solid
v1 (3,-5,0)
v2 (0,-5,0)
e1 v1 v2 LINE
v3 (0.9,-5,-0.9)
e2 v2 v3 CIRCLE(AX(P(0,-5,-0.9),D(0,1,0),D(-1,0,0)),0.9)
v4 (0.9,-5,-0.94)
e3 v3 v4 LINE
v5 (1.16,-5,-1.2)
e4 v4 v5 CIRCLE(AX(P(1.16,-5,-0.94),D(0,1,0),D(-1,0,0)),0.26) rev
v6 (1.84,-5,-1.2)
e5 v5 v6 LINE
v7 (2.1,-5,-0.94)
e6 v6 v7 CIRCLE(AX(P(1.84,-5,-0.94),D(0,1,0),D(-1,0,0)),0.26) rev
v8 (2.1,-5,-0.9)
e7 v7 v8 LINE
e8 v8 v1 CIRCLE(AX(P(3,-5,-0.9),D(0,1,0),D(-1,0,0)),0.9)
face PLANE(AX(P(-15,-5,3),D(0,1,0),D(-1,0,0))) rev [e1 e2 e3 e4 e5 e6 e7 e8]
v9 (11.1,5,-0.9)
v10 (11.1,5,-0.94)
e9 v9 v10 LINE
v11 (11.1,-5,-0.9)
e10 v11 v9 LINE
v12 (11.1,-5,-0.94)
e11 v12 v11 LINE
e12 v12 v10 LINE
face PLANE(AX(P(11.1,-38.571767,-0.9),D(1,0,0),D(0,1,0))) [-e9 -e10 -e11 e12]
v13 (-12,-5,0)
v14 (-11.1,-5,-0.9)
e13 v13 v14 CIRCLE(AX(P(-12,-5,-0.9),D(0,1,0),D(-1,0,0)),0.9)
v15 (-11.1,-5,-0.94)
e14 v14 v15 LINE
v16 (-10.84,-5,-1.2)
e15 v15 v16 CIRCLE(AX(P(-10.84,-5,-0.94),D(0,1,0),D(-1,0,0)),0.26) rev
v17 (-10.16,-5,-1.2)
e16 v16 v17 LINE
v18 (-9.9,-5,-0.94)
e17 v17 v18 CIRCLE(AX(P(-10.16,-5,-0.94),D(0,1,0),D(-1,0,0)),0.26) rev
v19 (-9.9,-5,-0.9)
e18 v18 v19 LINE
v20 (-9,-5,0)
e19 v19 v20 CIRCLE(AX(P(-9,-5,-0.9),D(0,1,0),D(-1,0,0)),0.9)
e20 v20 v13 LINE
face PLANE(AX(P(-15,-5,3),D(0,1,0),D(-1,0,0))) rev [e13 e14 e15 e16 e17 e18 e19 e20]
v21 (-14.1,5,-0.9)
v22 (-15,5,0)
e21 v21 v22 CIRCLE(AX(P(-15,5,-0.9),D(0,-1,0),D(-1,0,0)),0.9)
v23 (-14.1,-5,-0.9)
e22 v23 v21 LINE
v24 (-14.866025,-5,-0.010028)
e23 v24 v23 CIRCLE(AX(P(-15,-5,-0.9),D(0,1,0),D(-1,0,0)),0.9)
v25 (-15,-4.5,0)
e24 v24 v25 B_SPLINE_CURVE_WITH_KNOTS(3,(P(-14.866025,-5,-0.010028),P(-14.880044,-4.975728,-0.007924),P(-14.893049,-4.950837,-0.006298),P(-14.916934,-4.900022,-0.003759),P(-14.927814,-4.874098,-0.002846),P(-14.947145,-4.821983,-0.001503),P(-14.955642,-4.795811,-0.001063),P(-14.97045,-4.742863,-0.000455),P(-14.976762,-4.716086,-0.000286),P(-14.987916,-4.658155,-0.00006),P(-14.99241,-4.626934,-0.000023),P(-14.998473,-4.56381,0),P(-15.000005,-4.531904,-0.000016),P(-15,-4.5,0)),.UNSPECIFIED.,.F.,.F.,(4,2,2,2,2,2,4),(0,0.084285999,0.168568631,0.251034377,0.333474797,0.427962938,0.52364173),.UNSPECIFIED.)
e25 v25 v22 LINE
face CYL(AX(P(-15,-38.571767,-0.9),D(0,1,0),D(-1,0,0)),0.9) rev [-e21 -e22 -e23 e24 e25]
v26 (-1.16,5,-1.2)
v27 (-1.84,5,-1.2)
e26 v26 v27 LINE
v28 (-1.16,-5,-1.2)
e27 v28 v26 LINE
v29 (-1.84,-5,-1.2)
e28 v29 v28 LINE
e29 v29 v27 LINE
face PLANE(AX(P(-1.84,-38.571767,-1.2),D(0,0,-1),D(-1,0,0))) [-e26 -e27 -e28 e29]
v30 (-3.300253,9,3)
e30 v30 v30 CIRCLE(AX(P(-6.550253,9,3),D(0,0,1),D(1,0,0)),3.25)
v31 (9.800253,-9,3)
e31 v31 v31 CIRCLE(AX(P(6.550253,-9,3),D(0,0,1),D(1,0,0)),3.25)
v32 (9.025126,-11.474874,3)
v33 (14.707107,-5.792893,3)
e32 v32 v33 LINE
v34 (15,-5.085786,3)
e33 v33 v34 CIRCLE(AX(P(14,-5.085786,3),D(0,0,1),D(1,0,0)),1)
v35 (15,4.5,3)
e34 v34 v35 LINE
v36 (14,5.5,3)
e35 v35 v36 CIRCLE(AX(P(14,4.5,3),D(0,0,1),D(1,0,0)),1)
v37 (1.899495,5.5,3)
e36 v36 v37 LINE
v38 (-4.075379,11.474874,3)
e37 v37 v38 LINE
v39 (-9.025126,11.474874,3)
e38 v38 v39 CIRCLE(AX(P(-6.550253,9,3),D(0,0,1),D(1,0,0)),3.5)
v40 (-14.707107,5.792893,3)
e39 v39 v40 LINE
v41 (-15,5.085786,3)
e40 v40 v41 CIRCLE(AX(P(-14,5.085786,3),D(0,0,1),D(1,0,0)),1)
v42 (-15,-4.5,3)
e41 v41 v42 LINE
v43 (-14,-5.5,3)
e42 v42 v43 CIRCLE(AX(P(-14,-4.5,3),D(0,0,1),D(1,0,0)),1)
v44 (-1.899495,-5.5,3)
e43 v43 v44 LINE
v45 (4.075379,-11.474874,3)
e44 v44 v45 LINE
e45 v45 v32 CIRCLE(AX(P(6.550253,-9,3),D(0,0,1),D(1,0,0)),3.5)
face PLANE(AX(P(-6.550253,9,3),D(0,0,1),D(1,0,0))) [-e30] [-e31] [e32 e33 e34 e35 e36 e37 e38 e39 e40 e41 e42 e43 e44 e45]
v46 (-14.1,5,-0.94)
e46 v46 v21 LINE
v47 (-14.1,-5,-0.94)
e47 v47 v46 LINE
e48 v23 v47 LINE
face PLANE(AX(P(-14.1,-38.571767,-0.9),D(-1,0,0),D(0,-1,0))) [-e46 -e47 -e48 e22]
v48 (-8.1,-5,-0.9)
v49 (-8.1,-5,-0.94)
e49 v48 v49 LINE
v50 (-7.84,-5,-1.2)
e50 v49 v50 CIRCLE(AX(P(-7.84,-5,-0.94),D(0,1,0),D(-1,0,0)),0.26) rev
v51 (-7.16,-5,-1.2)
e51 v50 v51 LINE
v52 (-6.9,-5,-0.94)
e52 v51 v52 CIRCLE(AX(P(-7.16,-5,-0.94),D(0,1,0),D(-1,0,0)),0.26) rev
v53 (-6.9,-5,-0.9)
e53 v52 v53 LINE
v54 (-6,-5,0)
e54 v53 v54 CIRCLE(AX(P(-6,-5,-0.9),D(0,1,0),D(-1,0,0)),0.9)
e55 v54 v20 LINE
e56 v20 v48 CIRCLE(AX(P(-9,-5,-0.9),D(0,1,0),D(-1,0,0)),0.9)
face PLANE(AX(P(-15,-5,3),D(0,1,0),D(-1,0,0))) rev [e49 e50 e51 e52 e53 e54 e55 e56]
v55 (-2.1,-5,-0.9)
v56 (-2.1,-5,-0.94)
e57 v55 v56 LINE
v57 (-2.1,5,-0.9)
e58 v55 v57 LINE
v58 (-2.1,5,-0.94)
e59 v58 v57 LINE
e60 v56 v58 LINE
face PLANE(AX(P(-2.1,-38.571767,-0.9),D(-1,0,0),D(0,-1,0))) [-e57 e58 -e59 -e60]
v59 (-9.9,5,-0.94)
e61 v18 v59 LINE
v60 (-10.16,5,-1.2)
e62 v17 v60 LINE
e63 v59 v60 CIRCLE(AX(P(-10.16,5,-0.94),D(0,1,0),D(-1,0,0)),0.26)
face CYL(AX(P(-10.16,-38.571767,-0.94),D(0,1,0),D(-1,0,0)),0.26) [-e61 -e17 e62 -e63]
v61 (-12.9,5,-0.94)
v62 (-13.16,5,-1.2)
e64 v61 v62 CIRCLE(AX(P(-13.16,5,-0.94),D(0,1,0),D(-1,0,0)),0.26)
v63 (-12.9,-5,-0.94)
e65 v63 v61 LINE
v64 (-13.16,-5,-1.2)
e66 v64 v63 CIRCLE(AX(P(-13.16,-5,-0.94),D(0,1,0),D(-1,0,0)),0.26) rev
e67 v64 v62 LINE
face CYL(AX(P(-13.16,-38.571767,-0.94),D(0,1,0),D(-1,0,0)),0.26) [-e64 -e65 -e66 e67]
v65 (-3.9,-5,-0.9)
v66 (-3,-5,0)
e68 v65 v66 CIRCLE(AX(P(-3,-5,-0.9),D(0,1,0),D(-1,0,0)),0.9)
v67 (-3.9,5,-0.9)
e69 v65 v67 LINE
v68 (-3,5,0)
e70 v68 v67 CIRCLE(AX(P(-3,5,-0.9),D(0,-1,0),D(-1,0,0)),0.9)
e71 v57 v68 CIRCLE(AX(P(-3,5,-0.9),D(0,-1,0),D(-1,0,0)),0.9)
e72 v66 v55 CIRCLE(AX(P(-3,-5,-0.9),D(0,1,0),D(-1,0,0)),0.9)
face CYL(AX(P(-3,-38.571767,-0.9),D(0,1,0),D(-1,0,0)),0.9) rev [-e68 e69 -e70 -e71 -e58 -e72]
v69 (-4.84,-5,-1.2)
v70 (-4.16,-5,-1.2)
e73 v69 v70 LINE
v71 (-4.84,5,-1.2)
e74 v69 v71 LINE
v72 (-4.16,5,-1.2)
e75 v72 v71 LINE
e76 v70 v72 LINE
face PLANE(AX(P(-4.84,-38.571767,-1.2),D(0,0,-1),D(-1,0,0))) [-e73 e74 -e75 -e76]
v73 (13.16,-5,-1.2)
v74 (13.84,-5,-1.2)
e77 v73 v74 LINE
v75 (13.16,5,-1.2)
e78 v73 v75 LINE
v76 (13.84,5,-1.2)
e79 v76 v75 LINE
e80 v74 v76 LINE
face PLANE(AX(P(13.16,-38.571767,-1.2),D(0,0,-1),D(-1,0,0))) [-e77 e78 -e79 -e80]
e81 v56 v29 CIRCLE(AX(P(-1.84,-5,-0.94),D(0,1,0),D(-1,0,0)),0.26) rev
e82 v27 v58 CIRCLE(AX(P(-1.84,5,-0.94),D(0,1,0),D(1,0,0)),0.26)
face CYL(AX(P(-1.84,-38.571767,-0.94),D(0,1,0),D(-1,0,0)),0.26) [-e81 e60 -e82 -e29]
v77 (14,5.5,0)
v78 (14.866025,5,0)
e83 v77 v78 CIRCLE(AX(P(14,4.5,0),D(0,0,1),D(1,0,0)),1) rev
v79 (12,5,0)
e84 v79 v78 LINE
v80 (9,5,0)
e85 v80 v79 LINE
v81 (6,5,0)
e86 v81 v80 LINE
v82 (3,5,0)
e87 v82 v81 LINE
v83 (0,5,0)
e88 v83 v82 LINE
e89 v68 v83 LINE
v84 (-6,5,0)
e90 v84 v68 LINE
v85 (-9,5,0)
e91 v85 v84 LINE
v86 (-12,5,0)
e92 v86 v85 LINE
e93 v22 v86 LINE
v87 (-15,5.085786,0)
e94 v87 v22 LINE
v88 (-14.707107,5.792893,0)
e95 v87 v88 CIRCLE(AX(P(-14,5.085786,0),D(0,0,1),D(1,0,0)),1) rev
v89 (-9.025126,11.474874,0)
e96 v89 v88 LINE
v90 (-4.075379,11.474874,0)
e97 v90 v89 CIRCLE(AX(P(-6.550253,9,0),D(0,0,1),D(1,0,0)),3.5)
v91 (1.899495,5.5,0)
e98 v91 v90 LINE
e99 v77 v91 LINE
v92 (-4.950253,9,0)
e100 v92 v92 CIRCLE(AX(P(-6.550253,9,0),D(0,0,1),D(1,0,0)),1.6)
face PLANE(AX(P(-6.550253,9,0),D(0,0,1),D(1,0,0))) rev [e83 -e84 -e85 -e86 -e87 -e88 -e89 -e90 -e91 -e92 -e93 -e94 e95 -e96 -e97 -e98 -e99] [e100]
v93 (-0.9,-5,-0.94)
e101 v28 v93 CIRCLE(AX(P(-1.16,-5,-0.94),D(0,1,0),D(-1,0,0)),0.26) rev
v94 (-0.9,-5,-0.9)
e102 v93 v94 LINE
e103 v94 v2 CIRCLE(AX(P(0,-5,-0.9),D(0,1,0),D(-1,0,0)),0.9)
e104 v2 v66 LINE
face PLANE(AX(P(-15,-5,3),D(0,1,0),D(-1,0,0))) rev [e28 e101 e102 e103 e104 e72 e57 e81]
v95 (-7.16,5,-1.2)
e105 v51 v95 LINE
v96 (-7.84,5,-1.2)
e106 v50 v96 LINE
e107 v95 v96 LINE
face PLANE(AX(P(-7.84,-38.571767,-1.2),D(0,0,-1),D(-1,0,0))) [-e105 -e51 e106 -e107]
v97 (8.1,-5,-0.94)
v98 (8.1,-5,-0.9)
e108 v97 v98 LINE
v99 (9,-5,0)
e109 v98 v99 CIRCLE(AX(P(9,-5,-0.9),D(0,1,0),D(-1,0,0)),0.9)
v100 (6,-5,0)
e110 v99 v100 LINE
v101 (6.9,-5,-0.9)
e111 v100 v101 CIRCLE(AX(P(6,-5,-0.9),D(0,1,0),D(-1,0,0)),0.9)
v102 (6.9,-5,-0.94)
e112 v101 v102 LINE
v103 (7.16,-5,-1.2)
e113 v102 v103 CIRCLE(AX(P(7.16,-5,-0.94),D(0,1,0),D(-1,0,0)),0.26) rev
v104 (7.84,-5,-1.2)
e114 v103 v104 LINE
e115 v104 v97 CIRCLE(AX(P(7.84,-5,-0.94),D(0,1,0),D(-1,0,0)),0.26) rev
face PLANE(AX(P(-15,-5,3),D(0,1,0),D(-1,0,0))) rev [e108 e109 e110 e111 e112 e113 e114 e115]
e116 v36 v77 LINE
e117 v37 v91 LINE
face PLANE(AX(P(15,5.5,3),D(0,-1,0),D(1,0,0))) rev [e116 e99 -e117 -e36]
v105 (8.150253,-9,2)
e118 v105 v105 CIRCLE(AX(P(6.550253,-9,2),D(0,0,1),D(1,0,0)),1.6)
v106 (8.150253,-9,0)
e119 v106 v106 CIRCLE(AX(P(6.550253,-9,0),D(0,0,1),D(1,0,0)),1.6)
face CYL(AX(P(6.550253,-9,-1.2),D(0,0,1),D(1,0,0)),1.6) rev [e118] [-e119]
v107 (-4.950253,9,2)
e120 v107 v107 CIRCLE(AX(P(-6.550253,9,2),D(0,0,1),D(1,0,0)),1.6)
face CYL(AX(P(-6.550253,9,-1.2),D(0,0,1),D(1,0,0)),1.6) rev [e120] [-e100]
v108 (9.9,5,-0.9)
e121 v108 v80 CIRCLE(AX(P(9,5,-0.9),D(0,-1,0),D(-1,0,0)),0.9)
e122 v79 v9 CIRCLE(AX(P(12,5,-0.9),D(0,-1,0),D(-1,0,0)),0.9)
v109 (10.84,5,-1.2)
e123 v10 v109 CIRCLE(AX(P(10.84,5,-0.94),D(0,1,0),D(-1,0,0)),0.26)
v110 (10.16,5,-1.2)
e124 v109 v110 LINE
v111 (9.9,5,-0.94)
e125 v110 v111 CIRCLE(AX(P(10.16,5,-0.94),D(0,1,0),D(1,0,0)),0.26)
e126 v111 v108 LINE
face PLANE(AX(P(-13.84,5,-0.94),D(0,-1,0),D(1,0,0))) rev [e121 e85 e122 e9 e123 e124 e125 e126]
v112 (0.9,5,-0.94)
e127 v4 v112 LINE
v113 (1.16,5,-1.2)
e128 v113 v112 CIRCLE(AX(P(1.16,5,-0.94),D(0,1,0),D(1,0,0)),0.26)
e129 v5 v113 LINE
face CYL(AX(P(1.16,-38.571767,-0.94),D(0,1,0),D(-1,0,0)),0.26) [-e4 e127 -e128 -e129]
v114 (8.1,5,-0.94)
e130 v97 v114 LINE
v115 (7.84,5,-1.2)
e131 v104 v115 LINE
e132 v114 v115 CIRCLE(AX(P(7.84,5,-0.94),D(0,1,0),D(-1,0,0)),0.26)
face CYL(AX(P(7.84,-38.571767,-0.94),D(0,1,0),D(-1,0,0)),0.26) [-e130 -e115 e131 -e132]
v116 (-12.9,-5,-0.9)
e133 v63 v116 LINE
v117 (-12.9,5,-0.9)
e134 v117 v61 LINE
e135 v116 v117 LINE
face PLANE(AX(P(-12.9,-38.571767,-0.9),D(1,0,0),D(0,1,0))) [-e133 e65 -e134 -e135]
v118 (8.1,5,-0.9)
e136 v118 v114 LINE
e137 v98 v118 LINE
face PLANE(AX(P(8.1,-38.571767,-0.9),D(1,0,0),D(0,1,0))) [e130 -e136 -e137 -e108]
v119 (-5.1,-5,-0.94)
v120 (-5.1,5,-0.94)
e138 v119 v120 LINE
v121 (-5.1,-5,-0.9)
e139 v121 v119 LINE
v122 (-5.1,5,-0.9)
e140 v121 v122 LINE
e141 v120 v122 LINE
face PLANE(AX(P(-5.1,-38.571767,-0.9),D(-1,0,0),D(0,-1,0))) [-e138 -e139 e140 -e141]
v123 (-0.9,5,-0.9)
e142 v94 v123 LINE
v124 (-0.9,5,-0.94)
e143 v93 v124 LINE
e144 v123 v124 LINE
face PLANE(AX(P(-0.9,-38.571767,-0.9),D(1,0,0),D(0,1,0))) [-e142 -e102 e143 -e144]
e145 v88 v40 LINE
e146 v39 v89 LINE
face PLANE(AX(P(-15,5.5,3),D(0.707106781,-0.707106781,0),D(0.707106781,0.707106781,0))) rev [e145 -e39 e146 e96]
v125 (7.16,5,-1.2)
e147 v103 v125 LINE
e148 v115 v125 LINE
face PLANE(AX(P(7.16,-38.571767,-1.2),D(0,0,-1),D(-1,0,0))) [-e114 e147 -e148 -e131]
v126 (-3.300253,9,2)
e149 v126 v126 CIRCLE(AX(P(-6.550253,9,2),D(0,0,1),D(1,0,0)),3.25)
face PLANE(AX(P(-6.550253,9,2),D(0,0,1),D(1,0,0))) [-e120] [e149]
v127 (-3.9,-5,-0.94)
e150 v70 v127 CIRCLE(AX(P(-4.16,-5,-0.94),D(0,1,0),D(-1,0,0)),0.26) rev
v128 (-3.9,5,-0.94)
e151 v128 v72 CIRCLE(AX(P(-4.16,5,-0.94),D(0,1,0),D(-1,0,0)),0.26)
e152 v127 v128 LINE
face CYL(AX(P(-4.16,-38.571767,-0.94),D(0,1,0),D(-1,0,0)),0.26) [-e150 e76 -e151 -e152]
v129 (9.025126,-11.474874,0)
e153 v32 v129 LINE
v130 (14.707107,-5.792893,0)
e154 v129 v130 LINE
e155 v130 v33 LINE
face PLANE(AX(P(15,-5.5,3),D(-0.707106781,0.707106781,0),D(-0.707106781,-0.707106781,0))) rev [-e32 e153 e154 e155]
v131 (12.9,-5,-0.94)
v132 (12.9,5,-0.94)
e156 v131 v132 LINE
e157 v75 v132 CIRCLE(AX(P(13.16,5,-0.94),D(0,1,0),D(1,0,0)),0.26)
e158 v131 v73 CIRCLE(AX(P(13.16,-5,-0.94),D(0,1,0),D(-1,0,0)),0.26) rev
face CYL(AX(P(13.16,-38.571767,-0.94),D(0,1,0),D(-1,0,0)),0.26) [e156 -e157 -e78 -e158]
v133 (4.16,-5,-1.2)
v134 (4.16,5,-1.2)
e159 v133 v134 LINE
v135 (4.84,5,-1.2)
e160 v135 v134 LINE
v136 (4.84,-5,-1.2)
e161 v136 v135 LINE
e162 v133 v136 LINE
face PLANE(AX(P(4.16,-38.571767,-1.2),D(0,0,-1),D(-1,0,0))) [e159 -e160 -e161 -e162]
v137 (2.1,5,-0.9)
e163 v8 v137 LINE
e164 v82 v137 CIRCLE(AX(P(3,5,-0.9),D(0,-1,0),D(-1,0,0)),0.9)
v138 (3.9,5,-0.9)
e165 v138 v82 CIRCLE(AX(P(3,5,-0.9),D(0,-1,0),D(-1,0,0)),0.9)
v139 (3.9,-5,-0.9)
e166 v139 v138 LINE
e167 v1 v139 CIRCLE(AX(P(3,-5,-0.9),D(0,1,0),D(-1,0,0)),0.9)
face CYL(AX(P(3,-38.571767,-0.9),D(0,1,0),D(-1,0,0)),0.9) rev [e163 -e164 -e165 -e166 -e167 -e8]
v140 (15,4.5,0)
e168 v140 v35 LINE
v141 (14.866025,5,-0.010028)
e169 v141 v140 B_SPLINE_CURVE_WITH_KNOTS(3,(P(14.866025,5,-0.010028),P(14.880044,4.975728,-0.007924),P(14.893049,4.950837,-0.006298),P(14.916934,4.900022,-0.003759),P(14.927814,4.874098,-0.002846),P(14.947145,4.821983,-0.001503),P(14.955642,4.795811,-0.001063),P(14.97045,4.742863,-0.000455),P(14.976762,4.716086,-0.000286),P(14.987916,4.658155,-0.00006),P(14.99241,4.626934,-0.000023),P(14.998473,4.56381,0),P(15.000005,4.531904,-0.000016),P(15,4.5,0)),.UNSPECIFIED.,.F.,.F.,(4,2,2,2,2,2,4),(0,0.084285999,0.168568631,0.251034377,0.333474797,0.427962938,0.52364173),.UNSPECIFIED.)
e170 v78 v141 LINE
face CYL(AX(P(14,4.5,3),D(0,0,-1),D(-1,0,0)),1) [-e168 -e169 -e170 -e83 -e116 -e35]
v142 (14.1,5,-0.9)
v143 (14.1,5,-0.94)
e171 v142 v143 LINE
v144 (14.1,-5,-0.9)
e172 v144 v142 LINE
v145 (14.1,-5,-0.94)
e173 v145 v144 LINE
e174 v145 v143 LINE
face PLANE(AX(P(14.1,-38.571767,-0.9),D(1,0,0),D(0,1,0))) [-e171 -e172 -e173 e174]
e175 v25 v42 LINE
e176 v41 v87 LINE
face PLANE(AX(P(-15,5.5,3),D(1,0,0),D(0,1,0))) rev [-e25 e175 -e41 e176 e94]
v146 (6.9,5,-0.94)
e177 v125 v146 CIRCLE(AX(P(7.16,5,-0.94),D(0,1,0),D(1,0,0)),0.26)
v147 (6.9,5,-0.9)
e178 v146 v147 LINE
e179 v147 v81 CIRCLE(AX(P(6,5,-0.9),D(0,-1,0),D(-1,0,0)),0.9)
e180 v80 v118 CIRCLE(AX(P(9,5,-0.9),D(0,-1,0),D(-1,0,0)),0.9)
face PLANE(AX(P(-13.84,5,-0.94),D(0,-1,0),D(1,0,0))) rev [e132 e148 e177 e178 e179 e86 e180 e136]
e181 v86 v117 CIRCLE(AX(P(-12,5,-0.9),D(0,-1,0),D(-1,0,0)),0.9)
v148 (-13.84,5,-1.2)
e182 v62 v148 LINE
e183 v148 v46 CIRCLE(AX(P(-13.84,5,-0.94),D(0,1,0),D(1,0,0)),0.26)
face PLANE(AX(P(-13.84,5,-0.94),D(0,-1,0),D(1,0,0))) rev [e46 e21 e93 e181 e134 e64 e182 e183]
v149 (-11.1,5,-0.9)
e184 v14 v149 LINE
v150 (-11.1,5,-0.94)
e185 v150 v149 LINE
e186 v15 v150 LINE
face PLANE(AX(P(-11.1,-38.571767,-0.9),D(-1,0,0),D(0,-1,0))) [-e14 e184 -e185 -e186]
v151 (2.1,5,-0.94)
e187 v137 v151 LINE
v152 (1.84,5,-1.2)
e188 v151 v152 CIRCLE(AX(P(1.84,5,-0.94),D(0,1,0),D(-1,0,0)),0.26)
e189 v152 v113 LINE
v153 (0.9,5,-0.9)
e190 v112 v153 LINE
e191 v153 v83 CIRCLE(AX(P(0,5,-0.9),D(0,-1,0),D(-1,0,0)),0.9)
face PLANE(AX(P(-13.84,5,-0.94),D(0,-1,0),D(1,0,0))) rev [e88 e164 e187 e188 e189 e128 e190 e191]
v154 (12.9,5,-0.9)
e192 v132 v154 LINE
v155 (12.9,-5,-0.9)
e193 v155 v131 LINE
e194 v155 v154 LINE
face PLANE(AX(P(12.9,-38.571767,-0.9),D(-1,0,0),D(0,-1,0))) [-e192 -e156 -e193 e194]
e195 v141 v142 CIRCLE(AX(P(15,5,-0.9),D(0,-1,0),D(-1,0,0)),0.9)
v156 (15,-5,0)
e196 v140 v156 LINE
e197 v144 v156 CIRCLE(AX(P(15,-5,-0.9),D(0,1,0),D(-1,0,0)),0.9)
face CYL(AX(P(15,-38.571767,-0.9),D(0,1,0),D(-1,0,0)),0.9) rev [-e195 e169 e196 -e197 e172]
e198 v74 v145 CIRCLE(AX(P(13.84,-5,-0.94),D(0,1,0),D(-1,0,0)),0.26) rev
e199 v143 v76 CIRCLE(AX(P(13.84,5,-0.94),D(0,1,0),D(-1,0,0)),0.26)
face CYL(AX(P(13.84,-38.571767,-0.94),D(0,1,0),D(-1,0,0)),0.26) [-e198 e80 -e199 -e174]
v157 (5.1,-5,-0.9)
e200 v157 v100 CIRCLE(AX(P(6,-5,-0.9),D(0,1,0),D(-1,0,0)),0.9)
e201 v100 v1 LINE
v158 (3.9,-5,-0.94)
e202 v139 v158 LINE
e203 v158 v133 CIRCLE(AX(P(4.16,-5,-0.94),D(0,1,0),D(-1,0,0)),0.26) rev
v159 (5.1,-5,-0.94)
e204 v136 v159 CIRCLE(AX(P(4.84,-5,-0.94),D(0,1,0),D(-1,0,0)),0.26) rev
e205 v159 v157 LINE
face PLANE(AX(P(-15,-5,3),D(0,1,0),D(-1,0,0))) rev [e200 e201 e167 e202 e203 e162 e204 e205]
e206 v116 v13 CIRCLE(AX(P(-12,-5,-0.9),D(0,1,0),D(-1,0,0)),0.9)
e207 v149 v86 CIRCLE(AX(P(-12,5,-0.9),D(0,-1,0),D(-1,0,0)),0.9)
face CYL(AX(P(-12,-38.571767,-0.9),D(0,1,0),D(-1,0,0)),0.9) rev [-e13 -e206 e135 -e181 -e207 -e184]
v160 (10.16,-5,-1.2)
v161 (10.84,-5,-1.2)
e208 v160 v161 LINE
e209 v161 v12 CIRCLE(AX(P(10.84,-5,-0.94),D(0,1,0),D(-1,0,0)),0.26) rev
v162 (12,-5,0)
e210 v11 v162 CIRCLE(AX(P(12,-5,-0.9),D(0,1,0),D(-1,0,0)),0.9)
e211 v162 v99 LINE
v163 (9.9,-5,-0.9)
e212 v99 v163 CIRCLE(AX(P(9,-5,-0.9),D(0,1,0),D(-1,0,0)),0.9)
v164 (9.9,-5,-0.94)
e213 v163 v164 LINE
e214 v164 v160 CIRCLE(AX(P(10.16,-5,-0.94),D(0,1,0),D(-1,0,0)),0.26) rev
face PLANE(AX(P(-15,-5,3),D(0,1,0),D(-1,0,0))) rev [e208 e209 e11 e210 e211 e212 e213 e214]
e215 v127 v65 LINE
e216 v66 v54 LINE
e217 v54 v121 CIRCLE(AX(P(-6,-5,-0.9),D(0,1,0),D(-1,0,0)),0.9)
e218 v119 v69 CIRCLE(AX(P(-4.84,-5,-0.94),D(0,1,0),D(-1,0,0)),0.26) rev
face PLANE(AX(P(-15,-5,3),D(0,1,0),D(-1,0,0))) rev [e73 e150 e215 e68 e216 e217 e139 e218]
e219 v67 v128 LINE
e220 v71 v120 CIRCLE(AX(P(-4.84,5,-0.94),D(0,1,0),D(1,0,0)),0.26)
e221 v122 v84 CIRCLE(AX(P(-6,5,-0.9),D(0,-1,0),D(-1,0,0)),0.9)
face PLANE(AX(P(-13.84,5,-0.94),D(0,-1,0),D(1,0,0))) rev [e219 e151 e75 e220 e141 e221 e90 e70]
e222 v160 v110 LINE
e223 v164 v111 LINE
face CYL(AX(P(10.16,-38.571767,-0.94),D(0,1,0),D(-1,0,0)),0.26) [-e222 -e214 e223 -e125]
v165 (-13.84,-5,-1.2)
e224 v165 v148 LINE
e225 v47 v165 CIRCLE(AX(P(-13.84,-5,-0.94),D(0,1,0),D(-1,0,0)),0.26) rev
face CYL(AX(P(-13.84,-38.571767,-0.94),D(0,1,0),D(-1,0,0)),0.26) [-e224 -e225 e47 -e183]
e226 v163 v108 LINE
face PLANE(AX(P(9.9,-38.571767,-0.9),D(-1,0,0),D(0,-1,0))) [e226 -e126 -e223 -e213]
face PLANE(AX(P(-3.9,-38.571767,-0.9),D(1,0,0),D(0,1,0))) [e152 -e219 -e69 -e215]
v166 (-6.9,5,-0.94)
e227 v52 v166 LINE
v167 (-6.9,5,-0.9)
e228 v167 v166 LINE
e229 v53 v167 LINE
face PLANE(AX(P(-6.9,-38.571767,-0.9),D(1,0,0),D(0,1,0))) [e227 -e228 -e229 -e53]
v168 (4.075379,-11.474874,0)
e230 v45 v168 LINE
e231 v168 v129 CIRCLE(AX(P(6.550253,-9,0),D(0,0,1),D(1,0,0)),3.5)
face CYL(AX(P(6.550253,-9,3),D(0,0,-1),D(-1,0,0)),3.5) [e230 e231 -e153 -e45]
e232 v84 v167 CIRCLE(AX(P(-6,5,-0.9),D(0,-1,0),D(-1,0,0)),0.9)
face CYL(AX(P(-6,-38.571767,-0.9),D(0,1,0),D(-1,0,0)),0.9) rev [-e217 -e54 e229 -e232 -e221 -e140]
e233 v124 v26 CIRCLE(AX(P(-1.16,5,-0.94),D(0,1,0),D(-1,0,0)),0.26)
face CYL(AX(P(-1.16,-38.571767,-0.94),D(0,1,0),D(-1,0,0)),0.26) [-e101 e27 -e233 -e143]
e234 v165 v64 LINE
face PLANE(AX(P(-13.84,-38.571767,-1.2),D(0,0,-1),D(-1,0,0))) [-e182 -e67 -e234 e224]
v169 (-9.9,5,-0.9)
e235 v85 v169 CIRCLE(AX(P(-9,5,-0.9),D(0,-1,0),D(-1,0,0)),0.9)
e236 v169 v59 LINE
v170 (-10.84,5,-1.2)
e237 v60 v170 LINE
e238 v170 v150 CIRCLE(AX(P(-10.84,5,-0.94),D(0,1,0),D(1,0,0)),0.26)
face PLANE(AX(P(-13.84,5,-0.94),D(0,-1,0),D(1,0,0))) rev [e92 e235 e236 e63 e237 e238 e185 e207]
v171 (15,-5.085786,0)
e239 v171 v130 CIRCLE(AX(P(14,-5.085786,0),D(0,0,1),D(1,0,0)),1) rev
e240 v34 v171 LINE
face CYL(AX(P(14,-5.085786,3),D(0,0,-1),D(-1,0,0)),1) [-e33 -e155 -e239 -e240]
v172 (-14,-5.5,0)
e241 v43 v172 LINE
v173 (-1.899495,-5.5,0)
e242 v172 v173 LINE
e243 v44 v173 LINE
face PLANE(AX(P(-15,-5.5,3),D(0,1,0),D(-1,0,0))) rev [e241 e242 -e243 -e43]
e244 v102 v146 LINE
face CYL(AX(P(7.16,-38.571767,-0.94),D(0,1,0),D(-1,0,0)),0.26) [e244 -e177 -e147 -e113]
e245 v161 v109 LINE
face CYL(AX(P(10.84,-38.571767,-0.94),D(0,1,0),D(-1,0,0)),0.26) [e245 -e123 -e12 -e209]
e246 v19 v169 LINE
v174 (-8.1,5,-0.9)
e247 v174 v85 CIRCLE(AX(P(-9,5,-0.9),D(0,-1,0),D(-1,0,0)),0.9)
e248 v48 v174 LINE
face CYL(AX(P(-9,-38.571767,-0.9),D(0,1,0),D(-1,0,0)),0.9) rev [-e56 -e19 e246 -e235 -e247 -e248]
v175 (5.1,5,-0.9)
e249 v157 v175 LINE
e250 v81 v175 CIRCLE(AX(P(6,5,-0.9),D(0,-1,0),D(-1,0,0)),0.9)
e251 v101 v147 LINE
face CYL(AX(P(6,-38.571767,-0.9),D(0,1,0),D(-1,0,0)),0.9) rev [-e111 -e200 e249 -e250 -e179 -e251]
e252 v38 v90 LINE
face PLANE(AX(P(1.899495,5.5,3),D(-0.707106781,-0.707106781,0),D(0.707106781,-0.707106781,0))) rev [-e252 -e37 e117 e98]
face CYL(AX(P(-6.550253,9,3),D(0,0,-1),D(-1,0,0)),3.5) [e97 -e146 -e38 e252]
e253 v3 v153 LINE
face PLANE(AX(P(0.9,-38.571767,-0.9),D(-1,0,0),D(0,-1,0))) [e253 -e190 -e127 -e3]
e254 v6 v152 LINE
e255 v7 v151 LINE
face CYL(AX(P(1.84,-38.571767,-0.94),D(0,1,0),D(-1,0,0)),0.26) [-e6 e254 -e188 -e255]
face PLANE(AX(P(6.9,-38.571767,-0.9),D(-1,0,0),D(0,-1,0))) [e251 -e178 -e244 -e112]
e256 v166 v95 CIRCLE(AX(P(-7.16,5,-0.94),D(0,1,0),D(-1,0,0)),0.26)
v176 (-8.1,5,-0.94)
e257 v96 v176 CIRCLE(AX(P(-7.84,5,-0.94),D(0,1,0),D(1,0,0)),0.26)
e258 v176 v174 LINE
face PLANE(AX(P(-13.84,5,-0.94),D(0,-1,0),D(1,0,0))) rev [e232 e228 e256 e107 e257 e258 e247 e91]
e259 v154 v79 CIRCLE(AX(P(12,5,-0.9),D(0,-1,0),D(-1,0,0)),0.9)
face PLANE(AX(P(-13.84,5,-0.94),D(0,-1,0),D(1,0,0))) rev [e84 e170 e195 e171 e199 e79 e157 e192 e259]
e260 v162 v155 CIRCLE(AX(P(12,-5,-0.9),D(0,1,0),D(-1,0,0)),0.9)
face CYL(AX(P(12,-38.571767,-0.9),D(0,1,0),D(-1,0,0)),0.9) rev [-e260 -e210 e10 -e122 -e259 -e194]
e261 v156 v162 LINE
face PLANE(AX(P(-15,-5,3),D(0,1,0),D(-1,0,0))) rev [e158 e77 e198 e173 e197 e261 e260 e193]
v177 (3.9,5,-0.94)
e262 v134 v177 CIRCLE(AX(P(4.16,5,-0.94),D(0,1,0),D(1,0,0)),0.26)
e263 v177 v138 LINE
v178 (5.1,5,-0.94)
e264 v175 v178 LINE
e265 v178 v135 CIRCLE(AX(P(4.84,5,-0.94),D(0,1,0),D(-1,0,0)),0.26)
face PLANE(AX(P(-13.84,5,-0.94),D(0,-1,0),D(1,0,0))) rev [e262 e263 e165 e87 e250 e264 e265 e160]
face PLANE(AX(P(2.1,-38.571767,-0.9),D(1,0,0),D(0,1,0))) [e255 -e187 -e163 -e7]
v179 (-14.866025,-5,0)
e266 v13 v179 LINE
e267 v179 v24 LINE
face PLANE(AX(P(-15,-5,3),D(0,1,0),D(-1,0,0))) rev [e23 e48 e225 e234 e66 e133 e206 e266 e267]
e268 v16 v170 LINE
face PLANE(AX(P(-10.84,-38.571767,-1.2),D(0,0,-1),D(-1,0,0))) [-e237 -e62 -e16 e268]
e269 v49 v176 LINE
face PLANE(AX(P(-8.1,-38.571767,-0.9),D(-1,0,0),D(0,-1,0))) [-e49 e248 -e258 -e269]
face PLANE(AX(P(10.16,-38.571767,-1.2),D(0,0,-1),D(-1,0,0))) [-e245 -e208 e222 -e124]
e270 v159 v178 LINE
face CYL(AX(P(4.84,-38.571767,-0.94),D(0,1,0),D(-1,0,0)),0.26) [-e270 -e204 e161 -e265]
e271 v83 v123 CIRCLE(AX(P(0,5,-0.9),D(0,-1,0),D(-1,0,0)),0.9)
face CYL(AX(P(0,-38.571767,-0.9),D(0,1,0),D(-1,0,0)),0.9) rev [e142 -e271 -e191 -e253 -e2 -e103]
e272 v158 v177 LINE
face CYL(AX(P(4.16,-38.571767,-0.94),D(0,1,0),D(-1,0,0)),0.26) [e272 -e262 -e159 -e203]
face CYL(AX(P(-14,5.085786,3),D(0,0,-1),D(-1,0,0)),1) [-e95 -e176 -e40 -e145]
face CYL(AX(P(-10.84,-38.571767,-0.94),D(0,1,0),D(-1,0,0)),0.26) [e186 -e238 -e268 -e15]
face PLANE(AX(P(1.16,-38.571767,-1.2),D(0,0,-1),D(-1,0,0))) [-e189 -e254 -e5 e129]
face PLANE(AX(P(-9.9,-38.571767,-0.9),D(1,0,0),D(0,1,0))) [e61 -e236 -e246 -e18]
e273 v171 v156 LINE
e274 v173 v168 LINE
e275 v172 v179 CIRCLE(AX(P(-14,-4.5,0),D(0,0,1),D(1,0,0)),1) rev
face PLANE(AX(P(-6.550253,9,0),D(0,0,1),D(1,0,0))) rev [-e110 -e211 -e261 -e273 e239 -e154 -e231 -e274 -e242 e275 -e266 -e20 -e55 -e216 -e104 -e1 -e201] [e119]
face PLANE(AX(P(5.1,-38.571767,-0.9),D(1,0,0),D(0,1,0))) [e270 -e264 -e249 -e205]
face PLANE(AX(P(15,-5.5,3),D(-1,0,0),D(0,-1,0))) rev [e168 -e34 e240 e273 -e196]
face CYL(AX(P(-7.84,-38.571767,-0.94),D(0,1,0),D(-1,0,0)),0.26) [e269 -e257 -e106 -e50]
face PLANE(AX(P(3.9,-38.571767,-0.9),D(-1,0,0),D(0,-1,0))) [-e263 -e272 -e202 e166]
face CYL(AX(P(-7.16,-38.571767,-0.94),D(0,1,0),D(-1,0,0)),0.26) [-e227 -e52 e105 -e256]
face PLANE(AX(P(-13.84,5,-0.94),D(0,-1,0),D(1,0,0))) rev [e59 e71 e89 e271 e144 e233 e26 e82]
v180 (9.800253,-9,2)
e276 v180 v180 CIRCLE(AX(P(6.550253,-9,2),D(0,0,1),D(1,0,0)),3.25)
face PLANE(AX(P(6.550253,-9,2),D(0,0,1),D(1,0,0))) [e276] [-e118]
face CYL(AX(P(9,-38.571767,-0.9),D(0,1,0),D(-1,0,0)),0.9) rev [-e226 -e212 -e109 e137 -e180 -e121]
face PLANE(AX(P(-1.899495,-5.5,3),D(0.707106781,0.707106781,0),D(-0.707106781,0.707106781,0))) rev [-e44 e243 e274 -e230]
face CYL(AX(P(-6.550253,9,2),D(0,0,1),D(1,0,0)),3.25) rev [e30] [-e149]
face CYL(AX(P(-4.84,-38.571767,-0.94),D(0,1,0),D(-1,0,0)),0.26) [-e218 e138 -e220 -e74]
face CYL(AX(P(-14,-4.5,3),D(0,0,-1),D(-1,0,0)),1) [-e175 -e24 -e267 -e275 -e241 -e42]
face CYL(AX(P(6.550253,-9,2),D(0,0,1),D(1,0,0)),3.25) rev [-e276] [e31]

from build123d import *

# Parameters (mm, degrees)
EXTRUDE_1_DEPTH     = 3
SKETCH_3_R          = 3.25
CUT_EXTRUDE_1_DEPTH = 1
EXTRUDE_START       = -0.5
EXTRUDE_2_DEPTH     = 10
SKETCH_5_OUTSIDE_W  = 43.322
SKETCH_5_OUTSIDE_H  = 35.322
CUT_EXTRUDE_2_DEPTH = 22.122026418
FILLET_1_R          = 1
SKETCH_6_R          = 1.6
CUT_EXTRUDE_3_DEPTH = 20.972230797


# Read off the part's stored shape, not the designer's step: 凸台-拉伸1
with BuildPart() as part:
    # 凸台-拉伸1 outline → 凸台-拉伸1 (new body)
    with BuildSketch(Plane.XY):
        with BuildLine():
            Line((15, -5.5), (15, 5.5))
            Line((15, 5.5), (1.899494937, 5.5))
            Line((1.899494937, 5.5), (-4.075378798, 11.474873734))
            ThreePointArc((-4.075378798, 11.474873734), (-6.550252532, 12.5), (-9.025126266, 11.474873734))
            Line((-9.025126266, 11.474873734), (-15, 5.5))
            Line((-15, 5.5), (-15, -5.5))
            Line((-15, -5.5), (-1.899494937, -5.5))
            Line((-1.899494937, -5.5), (4.075378798, -11.474873734))
            ThreePointArc((4.075378798, -11.474873734), (6.550252532, -12.5), (9.025126266, -11.474873734))
            Line((9.025126266, -11.474873734), (15, -5.5))
        make_face()
    extrude(amount=EXTRUDE_1_DEPTH)

    # 草图3 → 切除-拉伸1 (cut)
    with BuildSketch(Plane.XY.offset(3)):
        with Locations((-6.550252532, 9)):
            Circle(SKETCH_3_R)
        with Locations((6.550252532, -9)):
            Circle(SKETCH_3_R)
    extrude(amount=-CUT_EXTRUDE_1_DEPTH, mode=Mode.SUBTRACT)

    # 草图4 → 凸台-拉伸2 (add)
    with BuildSketch(Plane(origin=(0, 5.5, 0), x_dir=(1, 0, 0), z_dir=(0, 1, 0)).offset(EXTRUDE_START)):
        with BuildLine():
            Line((-16.16, 1.2), (-16.5, 1.2))
            Line((-16.5, 1.2), (-16.5, -0.977568186))
            Line((-16.5, -0.977568186), (16.5, -0.977568186))
            Line((16.5, -0.977568186), (16.5, 1.2))
            Line((16.5, 1.2), (16.16, 1.2))
            ThreePointArc((16.16, 1.2), (15.976152237, 1.123847763), (15.9, 0.94))
            Line((15.9, 0.94), (15.9, 0.9))
            ThreePointArc((15.9, 0.9), (15, 0), (14.1, 0.9))
            Line((14.1, 0.9), (14.1, 0.94))
            ThreePointArc((14.1, 0.94), (14.023847763, 1.123847763), (13.84, 1.2))
            Line((13.84, 1.2), (13.5, 1.2))
            Line((13.5, 1.2), (13.16, 1.2))
            ThreePointArc((13.16, 1.2), (12.976152237, 1.123847763), (12.9, 0.94))
            Line((12.9, 0.94), (12.9, 0.9))
            ThreePointArc((12.9, 0.9), (12, 0), (11.1, 0.9))
            Line((11.1, 0.9), (11.1, 0.94))
            ThreePointArc((11.1, 0.94), (11.023847763, 1.123847763), (10.84, 1.2))
            Line((10.84, 1.2), (10.5, 1.2))
            Line((10.5, 1.2), (10.16, 1.2))
            ThreePointArc((10.16, 1.2), (9.976152237, 1.123847763), (9.9, 0.94))
            Line((9.9, 0.94), (9.9, 0.9))
            ThreePointArc((9.9, 0.9), (9, 0), (8.1, 0.9))
            Line((8.1, 0.9), (8.1, 0.94))
            ThreePointArc((8.1, 0.94), (8.023847763, 1.123847763), (7.84, 1.2))
            Line((7.84, 1.2), (7.5, 1.2))
            Line((7.5, 1.2), (7.16, 1.2))
            ThreePointArc((7.16, 1.2), (6.976152237, 1.123847763), (6.9, 0.94))
            Line((6.9, 0.94), (6.9, 0.9))
            ThreePointArc((6.9, 0.9), (6, 0), (5.1, 0.9))
            Line((5.1, 0.9), (5.1, 0.94))
            ThreePointArc((5.1, 0.94), (5.023847763, 1.123847763), (4.84, 1.2))
            Line((4.84, 1.2), (4.5, 1.2))
            Line((4.5, 1.2), (4.16, 1.2))
            ThreePointArc((4.16, 1.2), (3.976152237, 1.123847763), (3.9, 0.94))
            Line((3.9, 0.94), (3.9, 0.9))
            ThreePointArc((3.9, 0.9), (3, 0), (2.1, 0.9))
            Line((2.1, 0.9), (2.1, 0.94))
            ThreePointArc((2.1, 0.94), (2.023847763, 1.123847763), (1.84, 1.2))
            Line((1.84, 1.2), (1.5, 1.2))
            Line((1.5, 1.2), (1.16, 1.2))
            ThreePointArc((1.16, 1.2), (0.976152237, 1.123847763), (0.9, 0.94))
            Line((0.9, 0.94), (0.9, 0.9))
            ThreePointArc((0.9, 0.9), (0, 0), (-0.9, 0.9))
            Line((-0.9, 0.9), (-0.9, 0.94))
            ThreePointArc((-0.9, 0.94), (-0.976152237, 1.123847763), (-1.16, 1.2))
            Line((-1.16, 1.2), (-1.5, 1.2))
            Line((-1.5, 1.2), (-1.84, 1.2))
            ThreePointArc((-1.84, 1.2), (-2.023847763, 1.123847763), (-2.1, 0.94))
            Line((-2.1, 0.94), (-2.1, 0.9))
            ThreePointArc((-2.1, 0.9), (-3, 0), (-3.9, 0.9))
            Line((-3.9, 0.9), (-3.9, 0.94))
            ThreePointArc((-3.9, 0.94), (-3.976152237, 1.123847763), (-4.16, 1.2))
            Line((-4.16, 1.2), (-4.5, 1.2))
            Line((-4.5, 1.2), (-4.84, 1.2))
            ThreePointArc((-4.84, 1.2), (-5.023847763, 1.123847763), (-5.1, 0.94))
            Line((-5.1, 0.94), (-5.1, 0.9))
            ThreePointArc((-5.1, 0.9), (-6, 0), (-6.9, 0.9))
            Line((-6.9, 0.9), (-6.9, 0.94))
            ThreePointArc((-6.9, 0.94), (-6.976152237, 1.123847763), (-7.16, 1.2))
            Line((-7.16, 1.2), (-7.5, 1.2))
            Line((-7.5, 1.2), (-7.84, 1.2))
            ThreePointArc((-7.84, 1.2), (-8.023847763, 1.123847763), (-8.1, 0.94))
            Line((-8.1, 0.94), (-8.1, 0.9))
            ThreePointArc((-8.1, 0.9), (-9, 0), (-9.9, 0.9))
            Line((-9.9, 0.9), (-9.9, 0.94))
            ThreePointArc((-9.9, 0.94), (-9.976152237, 1.123847763), (-10.16, 1.2))
            Line((-10.16, 1.2), (-10.5, 1.2))
            Line((-10.5, 1.2), (-10.84, 1.2))
            ThreePointArc((-10.84, 1.2), (-11.023847763, 1.123847763), (-11.1, 0.94))
            Line((-11.1, 0.94), (-11.1, 0.9))
            ThreePointArc((-11.1, 0.9), (-12, 0), (-12.9, 0.9))
            Line((-12.9, 0.9), (-12.9, 0.94))
            ThreePointArc((-12.9, 0.94), (-12.976152237, 1.123847763), (-13.16, 1.2))
            Line((-13.16, 1.2), (-13.5, 1.2))
            Line((-13.5, 1.2), (-13.84, 1.2))
            ThreePointArc((-13.84, 1.2), (-14.023847763, 1.123847763), (-14.1, 0.94))
            Line((-14.1, 0.94), (-14.1, 0.9))
            ThreePointArc((-14.1, 0.9), (-15, 0), (-15.9, 0.9))
            Line((-15.9, 0.9), (-15.9, 0.94))
            ThreePointArc((-15.9, 0.94), (-15.976152237, 1.123847763), (-16.16, 1.2))
        make_face()
    extrude(amount=-EXTRUDE_2_DEPTH)

    # 草图5 outside → 切除-拉伸2 (cut, through all)
    with BuildSketch(Plane.XY.offset(3)):
        Rectangle(SKETCH_5_OUTSIDE_W, SKETCH_5_OUTSIDE_H)
        with BuildLine():
            Line((15, -5.5), (15, 5.5))
            Line((15, 5.5), (1.899494937, 5.5))
            Line((1.899494937, 5.5), (-4.075378798, 11.474873734))
            ThreePointArc((-4.075378798, 11.474873734), (-6.550252532, 12.5), (-9.025126266, 11.474873734))
            Line((-9.025126266, 11.474873734), (-15, 5.5))
            Line((-15, 5.5), (-15, -5.5))
            Line((-15, -5.5), (-1.899494937, -5.5))
            Line((-1.899494937, -5.5), (4.075378798, -11.474873734))
            ThreePointArc((4.075378798, -11.474873734), (6.550252532, -12.5), (9.025126266, -11.474873734))
            Line((9.025126266, -11.474873734), (15, -5.5))
        make_face(mode=Mode.SUBTRACT)
    extrude(amount=-CUT_EXTRUDE_2_DEPTH, mode=Mode.SUBTRACT)

    # 圆角1
    # the kernel refuses this fillet: 1 mm, written as the material it takes off along each edge
    with BuildSketch(Plane(origin=(15, -5.5, -1.035533906), x_dir=(-0.7071067811865454, -0.7071067811865497, 0), z_dir=(0, 0, 1))) as fillet_1_piece_1:
        with BuildLine():
            CenterArc((FILLET_1_R * 0.414213562373, -FILLET_1_R), FILLET_1_R, 90, 45)
            Line((-FILLET_1_R * 0.292893218813, -FILLET_1_R * 0.292893218813), (0, 0))
            Line((0, 0), (FILLET_1_R * 0.414213562373, 0))
        make_face()
    extrude(amount=5.071067812, mode=Mode.SUBTRACT)
    with BuildSketch(Plane(origin=(-15, -5.5, -2.5), x_dir=(1, 0, 0), z_dir=(0, 0, 1))) as fillet_1_piece_2:
        with BuildLine():
            CenterArc((FILLET_1_R, FILLET_1_R), FILLET_1_R, 180, 90)
            Line((0, FILLET_1_R), (0, 0))
            Line((0, 0), (FILLET_1_R, 0))
        make_face()
    extrude(amount=8, mode=Mode.SUBTRACT)
    with BuildSketch(Plane(origin=(-15, 5.5, -1.035533906), x_dir=(0, -1, 0), z_dir=(0, 0, 1))) as fillet_1_piece_3:
        with BuildLine():
            CenterArc((FILLET_1_R * 0.414213562373, FILLET_1_R), FILLET_1_R, 225, 45)
            Line((-FILLET_1_R * 0.292893218813, FILLET_1_R * 0.292893218813), (0, 0))
            Line((0, 0), (FILLET_1_R * 0.414213562373, 0))
        make_face()
    extrude(amount=5.071067812, mode=Mode.SUBTRACT)
    with BuildSketch(Plane(origin=(15, 5.5, -2.5), x_dir=(0, -1, 0), z_dir=(0, 0, 1))) as fillet_1_piece_4:
        with BuildLine():
            CenterArc((FILLET_1_R, -FILLET_1_R), FILLET_1_R, 90, 90)
            Line((0, -FILLET_1_R), (0, 0))
            Line((0, 0), (FILLET_1_R, 0))
        make_face()
    extrude(amount=8, mode=Mode.SUBTRACT)

    # 草图6 → 切除-拉伸3 (cut, through all)
    with BuildSketch(Plane.XY.offset(3)):
        with Locations((-6.550252532, 9)):
            Circle(SKETCH_6_R)
        with Locations((6.550252532, -9)):
            Circle(SKETCH_6_R)
    extrude(amount=-CUT_EXTRUDE_3_DEPTH, mode=Mode.SUBTRACT)


solid = part.part
